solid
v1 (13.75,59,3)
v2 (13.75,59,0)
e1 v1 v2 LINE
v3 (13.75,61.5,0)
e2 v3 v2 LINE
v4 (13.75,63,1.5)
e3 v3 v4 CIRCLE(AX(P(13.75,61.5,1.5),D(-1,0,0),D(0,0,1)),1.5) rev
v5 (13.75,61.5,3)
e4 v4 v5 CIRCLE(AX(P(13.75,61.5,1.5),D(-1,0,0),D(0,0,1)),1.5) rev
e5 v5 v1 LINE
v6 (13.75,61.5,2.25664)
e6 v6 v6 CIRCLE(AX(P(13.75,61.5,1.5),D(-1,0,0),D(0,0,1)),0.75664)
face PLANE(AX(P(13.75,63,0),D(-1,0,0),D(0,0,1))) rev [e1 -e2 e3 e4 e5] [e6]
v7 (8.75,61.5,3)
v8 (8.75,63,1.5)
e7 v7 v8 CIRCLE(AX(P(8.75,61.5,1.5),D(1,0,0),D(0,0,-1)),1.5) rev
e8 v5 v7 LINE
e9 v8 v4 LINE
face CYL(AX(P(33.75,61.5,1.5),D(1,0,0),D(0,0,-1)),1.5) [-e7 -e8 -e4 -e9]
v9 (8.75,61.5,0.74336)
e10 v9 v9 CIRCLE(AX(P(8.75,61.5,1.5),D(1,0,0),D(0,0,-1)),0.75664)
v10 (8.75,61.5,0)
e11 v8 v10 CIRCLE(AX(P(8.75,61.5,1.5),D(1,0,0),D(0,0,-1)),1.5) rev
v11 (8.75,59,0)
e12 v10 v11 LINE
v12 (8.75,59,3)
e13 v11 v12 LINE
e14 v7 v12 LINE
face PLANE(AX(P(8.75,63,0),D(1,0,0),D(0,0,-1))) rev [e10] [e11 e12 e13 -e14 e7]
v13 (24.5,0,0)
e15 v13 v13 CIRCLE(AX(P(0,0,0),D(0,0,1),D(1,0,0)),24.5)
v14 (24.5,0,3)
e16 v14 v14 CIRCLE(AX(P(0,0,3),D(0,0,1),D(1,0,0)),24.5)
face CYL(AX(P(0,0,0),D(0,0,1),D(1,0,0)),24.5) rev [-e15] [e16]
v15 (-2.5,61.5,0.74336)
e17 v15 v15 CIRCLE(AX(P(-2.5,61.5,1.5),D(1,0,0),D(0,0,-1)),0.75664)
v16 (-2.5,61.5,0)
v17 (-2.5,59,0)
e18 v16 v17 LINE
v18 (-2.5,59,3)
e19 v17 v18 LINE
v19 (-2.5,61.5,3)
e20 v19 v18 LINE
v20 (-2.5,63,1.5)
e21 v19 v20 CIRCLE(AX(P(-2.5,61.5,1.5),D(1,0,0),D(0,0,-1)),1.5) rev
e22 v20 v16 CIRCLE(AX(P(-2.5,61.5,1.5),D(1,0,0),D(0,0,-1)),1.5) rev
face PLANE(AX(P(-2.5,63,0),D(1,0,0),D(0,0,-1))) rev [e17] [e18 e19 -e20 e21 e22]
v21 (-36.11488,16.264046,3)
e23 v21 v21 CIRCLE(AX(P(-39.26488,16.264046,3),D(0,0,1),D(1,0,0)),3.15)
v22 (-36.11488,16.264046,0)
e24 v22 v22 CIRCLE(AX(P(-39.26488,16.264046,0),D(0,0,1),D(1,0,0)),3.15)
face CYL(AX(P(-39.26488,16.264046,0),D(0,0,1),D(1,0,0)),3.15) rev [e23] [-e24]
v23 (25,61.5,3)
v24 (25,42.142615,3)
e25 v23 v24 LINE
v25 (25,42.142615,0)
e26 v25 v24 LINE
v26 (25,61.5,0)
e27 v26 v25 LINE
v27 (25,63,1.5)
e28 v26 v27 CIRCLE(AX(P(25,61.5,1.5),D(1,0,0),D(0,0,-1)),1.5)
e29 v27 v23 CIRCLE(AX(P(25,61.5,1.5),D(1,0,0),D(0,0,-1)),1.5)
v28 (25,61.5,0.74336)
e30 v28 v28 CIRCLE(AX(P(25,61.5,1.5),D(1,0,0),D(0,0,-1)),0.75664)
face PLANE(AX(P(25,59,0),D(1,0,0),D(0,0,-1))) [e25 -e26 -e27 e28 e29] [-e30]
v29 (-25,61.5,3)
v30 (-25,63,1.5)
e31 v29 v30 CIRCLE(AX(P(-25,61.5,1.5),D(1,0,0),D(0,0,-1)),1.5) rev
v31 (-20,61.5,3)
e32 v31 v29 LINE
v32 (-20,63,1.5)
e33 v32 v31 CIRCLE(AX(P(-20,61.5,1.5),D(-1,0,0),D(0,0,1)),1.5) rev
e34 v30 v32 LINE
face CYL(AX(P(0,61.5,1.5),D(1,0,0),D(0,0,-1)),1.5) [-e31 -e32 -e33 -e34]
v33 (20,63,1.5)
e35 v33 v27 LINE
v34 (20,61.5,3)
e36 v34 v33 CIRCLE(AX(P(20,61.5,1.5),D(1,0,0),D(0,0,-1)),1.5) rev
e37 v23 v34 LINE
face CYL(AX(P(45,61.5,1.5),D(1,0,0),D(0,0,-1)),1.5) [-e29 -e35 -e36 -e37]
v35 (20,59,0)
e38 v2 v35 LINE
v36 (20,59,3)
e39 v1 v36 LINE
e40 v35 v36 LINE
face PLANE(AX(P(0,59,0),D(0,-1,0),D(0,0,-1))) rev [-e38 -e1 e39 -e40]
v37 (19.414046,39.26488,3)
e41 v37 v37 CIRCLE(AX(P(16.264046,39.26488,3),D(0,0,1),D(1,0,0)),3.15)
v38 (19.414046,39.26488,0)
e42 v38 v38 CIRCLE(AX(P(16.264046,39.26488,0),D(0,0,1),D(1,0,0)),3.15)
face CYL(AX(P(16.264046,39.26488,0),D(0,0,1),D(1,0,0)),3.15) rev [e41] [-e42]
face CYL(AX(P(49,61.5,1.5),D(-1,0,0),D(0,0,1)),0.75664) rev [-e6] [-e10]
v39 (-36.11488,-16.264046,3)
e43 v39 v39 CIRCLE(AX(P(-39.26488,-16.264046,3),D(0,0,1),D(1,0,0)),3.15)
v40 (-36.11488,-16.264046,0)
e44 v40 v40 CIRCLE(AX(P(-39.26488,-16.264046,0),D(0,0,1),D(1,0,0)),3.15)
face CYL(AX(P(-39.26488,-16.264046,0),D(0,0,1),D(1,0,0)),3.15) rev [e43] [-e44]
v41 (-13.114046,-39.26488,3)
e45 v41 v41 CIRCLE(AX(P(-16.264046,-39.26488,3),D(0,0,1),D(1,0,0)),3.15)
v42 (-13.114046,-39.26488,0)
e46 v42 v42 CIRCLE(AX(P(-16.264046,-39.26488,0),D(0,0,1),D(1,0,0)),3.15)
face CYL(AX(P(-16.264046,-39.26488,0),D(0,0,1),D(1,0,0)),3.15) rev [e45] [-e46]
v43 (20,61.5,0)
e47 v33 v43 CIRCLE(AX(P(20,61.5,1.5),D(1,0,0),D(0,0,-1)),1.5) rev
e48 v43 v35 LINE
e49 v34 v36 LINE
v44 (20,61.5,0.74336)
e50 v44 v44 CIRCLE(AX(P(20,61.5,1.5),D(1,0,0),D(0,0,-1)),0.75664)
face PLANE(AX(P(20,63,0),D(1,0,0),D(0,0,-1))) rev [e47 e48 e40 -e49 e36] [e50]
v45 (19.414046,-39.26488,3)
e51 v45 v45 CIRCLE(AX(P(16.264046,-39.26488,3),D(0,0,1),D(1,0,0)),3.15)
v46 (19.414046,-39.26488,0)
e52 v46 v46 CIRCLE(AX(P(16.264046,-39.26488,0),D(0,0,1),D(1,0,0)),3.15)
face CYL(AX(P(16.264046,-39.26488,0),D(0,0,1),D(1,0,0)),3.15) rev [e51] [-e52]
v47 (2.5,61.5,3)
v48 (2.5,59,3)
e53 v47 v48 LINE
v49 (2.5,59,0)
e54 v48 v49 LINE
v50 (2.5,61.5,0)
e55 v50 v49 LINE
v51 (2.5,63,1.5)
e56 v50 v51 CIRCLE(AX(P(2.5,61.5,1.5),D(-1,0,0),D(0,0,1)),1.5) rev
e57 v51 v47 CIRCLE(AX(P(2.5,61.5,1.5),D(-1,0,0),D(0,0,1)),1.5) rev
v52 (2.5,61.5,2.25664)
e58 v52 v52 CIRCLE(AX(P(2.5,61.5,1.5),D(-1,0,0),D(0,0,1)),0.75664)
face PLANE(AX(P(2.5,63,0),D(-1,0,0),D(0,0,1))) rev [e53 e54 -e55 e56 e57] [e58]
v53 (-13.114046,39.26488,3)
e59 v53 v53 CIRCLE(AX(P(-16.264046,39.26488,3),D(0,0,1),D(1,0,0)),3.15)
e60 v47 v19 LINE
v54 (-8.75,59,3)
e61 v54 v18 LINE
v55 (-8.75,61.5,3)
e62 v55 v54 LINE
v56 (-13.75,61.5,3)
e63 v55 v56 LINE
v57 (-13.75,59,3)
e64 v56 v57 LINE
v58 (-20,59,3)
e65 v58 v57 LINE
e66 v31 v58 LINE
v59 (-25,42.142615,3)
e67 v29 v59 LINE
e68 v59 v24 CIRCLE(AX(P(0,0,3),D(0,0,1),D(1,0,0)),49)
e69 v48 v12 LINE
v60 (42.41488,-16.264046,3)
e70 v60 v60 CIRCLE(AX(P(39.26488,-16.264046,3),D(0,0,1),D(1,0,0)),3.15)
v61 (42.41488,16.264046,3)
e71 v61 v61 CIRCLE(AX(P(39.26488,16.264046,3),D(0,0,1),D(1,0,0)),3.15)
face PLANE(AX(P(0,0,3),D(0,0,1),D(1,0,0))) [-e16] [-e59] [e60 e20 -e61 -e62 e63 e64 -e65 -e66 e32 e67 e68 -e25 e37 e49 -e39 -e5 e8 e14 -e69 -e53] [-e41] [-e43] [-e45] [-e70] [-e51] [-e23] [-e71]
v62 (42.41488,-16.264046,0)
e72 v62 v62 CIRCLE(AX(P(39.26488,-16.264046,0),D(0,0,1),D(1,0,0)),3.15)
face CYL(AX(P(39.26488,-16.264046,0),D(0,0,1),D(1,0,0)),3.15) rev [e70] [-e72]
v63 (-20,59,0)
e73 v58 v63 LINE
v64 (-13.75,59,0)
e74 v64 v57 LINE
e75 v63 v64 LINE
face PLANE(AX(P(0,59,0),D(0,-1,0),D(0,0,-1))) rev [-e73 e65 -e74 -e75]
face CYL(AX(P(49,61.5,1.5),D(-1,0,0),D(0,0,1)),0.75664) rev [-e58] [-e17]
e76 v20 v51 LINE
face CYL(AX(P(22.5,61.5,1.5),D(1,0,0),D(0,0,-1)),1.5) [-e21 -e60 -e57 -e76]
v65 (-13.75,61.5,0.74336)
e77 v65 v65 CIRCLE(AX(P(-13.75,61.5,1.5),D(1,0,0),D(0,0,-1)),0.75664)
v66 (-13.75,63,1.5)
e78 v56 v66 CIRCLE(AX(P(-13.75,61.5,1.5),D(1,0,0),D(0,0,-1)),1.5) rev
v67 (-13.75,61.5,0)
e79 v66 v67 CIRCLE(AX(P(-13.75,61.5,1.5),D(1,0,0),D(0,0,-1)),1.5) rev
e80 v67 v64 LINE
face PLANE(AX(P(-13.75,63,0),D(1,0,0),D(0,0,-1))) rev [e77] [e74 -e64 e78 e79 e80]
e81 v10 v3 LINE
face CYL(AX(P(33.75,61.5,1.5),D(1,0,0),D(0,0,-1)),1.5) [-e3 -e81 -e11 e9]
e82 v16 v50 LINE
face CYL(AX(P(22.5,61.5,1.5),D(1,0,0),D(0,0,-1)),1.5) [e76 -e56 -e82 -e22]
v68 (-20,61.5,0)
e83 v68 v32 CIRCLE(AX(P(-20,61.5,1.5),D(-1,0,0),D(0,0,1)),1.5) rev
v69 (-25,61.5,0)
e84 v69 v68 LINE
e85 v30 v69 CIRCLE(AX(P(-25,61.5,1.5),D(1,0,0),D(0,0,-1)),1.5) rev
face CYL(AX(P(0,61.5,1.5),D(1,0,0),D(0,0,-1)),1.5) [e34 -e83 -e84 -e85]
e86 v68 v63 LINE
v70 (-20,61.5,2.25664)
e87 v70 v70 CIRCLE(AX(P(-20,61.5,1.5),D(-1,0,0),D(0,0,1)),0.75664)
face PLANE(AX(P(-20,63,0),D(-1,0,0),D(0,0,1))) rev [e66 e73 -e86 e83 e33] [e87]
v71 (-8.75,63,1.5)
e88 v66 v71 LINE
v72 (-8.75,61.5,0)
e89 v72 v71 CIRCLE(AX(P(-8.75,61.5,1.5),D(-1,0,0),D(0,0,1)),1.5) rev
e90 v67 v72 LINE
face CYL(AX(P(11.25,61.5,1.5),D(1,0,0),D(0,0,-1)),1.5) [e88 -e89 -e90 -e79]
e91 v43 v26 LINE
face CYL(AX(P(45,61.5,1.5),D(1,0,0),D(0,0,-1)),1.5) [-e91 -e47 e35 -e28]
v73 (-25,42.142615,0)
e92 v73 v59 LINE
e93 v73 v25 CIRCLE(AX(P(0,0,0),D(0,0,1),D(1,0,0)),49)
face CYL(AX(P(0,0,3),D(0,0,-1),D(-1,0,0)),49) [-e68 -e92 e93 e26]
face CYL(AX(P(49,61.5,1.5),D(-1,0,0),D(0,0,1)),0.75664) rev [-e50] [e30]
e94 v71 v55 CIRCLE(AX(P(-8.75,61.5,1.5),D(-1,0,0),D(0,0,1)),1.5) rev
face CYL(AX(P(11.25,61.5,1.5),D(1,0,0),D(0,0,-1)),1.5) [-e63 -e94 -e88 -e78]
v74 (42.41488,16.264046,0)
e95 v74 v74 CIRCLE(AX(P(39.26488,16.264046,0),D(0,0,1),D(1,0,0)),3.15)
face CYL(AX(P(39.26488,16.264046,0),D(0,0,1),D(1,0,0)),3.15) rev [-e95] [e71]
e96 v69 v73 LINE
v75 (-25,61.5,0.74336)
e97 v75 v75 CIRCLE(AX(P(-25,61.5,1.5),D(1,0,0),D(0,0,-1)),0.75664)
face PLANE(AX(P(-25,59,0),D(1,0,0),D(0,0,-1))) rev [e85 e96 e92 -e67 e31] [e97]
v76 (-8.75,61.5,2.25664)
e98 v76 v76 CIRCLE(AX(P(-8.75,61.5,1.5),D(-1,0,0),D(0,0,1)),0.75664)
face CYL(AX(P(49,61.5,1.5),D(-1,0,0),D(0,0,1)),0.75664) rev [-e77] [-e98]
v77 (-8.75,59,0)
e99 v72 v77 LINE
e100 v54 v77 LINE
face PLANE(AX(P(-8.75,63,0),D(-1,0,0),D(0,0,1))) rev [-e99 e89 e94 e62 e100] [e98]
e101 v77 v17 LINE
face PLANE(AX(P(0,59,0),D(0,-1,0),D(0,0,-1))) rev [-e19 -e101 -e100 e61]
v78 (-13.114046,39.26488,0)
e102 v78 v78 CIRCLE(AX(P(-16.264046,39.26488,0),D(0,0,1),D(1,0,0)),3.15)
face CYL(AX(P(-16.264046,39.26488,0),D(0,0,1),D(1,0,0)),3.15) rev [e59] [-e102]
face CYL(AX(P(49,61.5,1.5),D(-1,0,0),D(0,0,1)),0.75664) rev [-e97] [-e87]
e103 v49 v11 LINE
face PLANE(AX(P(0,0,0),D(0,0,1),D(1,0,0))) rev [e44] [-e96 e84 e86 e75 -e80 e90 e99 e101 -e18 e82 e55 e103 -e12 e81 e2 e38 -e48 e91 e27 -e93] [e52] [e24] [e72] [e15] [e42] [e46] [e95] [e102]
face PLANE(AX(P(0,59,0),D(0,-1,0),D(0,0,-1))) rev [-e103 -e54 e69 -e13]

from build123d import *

# Parameters (mm, degrees)
SKETCH1_R                            = 49
BOSS_EXTRUDE1_DEPTH                  = 3
SKETCH2_R                            = 24.5
CUT_EXTRUDE1_DEPTH                   = 3
SKETCH3_R                            = 3.150000005
CUT_EXTRUDE2_DEPTH                   = 3
SKETCH5_W                            = 50
SKETCH5_H                            = 3
BOSS_EXTRUDE3_DEPTH                  = 10
BOSS_EXTRUDE3_DIRECTION_2_REACH      = 111.608
BOSS_EXTRUDE3_DIRECTION_2_END_RADIUS = 49
SKETCH6_W                            = 5
SKETCH6_H                            = 3
BOSS_EXTRUDE4_DEPTH                  = 4
FILLET1_R                            = 1.5
LPATTERN3_COUNT                      = 5
LPATTERN3_PITCH                      = 11.25
FILLET1_OF_LPATTERN3_R               = 1.5
CUT_EXTRUDE3_DEPTH                   = 98.231682079
CUT_EXTRUDE3_DEPTH_BACK              = 98.231682079
SKETCH7_R                            = 0.756640097


with BuildPart() as part:
    # Sketch1 → Boss-Extrude1 (new body)
    with BuildSketch(Plane.XY):
        Circle(SKETCH1_R)
    extrude(amount=BOSS_EXTRUDE1_DEPTH)

    # Sketch2 → Cut-Extrude1 (cut)
    with BuildSketch(Plane.XY.offset(3)):
        Circle(SKETCH2_R)
    extrude(amount=-CUT_EXTRUDE1_DEPTH, mode=Mode.SUBTRACT)

    # Sketch3 → Cut-Extrude2 (cut)
    with BuildSketch(Plane.XY.offset(3)):
        with Locations((16.264045876, -39.264880132)):
            Circle(SKETCH3_R)
        with Locations((39.264880132, -16.264045875)):
            Circle(SKETCH3_R)
        with Locations((39.264880132, 16.264045876)):
            Circle(SKETCH3_R)
        with Locations((16.264045876, 39.264880132)):
            Circle(SKETCH3_R)
        with Locations((-16.264045875, 39.264880132)):
            Circle(SKETCH3_R)
        with Locations((-39.264880132, 16.264045876)):
            Circle(SKETCH3_R)
        with Locations((-39.264880132, -16.264045875)):
            Circle(SKETCH3_R)
        with Locations((-16.264045875, -39.264880132)):
            Circle(SKETCH3_R)
    extrude(amount=-CUT_EXTRUDE2_DEPTH, mode=Mode.SUBTRACT)

    # Sketch5 → Boss-Extrude3 (add)
    with BuildSketch(Plane(origin=(0, 49, 0), x_dir=(1, 0, 0), z_dir=(0, 1, 0))):
        with Locations((0, -1.5)):
            Rectangle(SKETCH5_W, SKETCH5_H)
    extrude(amount=BOSS_EXTRUDE3_DEPTH)

    # Boss-Extrude3 direction 2: up to this cylinder (the profile starts outside it)
    boss_extrude3_direction_2_end = Plane(origin=(0, 0, 1.5), z_dir=(0, 0, -1)) * Cylinder(BOSS_EXTRUDE3_DIRECTION_2_END_RADIUS, 322.216, mode=Mode.PRIVATE)
    # Sketch5 → Boss-Extrude3 direction 2 (add, up to the surface)
    with BuildSketch(Plane(origin=(0, 49, 0), x_dir=(1, 0, 0), z_dir=(0, 1, 0)), mode=Mode.PRIVATE) as boss_extrude3_direction_2_sk1:
        with Locations((0, -1.5)):
            Rectangle(SKETCH5_W, SKETCH5_H)
    boss_extrude3_direction_2_tool1 = extrude(boss_extrude3_direction_2_sk1.sketch, amount=-BOSS_EXTRUDE3_DIRECTION_2_REACH, mode=Mode.PRIVATE) - boss_extrude3_direction_2_end
    add(boss_extrude3_direction_2_tool1.solids().sort_by_distance((0, 49, 1.5))[0])
    add(boss_extrude3_direction_2_tool1.solids().sort_by_distance((0, 49, 1.5))[1])

    # Sketch6 → Boss-Extrude4 (add)
    with BuildSketch(Plane(origin=(0, 59, 0), x_dir=(1, 0, 0), z_dir=(0, 1, 0))):
        with Locations((-22.5, -1.5)):
            Rectangle(SKETCH6_W, SKETCH6_H)
    boss_extrude4 = extrude(amount=BOSS_EXTRUDE4_DEPTH)

    # Fillet1
    fillet1_edges = [part.edges().sort_by_distance(p)[0] for p in [
        (-22.5, 63, 0),
        (-22.5, 63, 3),
    ]]
    fillet(fillet1_edges, radius=FILLET1_R - 0.0001)  # a hair under: the kernel refuses the full size

    # LPattern3: Boss-Extrude4 ×5
    with Locations(*[(i * LPATTERN3_PITCH, 0, 0) for i in range(1, LPATTERN3_COUNT)]):
        add(boss_extrude4)

    # Fillet1 of LPattern3
    fillet1_of_lpattern3_edges = [part.edges().sort_by_distance(p)[0] for p in [
        (-11.25, 63, 0),
        (-11.25, 63, 3),
        (0, 63, 0),
        (0, 63, 3),
        (11.25, 63, 0),
        (11.25, 63, 3),
        (22.5, 63, 0),
        (22.5, 63, 3),
    ]]
    fillet(fillet1_of_lpattern3_edges, radius=FILLET1_OF_LPATTERN3_R - 0.0001)  # a hair under: the kernel refuses the full size

    # Sketch7 → Cut-Extrude3 (cut, two sides: drawn at the far end of the back side and taken through both)
    with BuildSketch(Plane.ZY.offset(25).offset(-CUT_EXTRUDE3_DEPTH_BACK)):
        with Locations(Location((1.5, 61.5, 0), (0, 0, 180))):
            Circle(SKETCH7_R)
    extrude(amount=CUT_EXTRUDE3_DEPTH + CUT_EXTRUDE3_DEPTH_BACK, mode=Mode.SUBTRACT)


solid = part.part
